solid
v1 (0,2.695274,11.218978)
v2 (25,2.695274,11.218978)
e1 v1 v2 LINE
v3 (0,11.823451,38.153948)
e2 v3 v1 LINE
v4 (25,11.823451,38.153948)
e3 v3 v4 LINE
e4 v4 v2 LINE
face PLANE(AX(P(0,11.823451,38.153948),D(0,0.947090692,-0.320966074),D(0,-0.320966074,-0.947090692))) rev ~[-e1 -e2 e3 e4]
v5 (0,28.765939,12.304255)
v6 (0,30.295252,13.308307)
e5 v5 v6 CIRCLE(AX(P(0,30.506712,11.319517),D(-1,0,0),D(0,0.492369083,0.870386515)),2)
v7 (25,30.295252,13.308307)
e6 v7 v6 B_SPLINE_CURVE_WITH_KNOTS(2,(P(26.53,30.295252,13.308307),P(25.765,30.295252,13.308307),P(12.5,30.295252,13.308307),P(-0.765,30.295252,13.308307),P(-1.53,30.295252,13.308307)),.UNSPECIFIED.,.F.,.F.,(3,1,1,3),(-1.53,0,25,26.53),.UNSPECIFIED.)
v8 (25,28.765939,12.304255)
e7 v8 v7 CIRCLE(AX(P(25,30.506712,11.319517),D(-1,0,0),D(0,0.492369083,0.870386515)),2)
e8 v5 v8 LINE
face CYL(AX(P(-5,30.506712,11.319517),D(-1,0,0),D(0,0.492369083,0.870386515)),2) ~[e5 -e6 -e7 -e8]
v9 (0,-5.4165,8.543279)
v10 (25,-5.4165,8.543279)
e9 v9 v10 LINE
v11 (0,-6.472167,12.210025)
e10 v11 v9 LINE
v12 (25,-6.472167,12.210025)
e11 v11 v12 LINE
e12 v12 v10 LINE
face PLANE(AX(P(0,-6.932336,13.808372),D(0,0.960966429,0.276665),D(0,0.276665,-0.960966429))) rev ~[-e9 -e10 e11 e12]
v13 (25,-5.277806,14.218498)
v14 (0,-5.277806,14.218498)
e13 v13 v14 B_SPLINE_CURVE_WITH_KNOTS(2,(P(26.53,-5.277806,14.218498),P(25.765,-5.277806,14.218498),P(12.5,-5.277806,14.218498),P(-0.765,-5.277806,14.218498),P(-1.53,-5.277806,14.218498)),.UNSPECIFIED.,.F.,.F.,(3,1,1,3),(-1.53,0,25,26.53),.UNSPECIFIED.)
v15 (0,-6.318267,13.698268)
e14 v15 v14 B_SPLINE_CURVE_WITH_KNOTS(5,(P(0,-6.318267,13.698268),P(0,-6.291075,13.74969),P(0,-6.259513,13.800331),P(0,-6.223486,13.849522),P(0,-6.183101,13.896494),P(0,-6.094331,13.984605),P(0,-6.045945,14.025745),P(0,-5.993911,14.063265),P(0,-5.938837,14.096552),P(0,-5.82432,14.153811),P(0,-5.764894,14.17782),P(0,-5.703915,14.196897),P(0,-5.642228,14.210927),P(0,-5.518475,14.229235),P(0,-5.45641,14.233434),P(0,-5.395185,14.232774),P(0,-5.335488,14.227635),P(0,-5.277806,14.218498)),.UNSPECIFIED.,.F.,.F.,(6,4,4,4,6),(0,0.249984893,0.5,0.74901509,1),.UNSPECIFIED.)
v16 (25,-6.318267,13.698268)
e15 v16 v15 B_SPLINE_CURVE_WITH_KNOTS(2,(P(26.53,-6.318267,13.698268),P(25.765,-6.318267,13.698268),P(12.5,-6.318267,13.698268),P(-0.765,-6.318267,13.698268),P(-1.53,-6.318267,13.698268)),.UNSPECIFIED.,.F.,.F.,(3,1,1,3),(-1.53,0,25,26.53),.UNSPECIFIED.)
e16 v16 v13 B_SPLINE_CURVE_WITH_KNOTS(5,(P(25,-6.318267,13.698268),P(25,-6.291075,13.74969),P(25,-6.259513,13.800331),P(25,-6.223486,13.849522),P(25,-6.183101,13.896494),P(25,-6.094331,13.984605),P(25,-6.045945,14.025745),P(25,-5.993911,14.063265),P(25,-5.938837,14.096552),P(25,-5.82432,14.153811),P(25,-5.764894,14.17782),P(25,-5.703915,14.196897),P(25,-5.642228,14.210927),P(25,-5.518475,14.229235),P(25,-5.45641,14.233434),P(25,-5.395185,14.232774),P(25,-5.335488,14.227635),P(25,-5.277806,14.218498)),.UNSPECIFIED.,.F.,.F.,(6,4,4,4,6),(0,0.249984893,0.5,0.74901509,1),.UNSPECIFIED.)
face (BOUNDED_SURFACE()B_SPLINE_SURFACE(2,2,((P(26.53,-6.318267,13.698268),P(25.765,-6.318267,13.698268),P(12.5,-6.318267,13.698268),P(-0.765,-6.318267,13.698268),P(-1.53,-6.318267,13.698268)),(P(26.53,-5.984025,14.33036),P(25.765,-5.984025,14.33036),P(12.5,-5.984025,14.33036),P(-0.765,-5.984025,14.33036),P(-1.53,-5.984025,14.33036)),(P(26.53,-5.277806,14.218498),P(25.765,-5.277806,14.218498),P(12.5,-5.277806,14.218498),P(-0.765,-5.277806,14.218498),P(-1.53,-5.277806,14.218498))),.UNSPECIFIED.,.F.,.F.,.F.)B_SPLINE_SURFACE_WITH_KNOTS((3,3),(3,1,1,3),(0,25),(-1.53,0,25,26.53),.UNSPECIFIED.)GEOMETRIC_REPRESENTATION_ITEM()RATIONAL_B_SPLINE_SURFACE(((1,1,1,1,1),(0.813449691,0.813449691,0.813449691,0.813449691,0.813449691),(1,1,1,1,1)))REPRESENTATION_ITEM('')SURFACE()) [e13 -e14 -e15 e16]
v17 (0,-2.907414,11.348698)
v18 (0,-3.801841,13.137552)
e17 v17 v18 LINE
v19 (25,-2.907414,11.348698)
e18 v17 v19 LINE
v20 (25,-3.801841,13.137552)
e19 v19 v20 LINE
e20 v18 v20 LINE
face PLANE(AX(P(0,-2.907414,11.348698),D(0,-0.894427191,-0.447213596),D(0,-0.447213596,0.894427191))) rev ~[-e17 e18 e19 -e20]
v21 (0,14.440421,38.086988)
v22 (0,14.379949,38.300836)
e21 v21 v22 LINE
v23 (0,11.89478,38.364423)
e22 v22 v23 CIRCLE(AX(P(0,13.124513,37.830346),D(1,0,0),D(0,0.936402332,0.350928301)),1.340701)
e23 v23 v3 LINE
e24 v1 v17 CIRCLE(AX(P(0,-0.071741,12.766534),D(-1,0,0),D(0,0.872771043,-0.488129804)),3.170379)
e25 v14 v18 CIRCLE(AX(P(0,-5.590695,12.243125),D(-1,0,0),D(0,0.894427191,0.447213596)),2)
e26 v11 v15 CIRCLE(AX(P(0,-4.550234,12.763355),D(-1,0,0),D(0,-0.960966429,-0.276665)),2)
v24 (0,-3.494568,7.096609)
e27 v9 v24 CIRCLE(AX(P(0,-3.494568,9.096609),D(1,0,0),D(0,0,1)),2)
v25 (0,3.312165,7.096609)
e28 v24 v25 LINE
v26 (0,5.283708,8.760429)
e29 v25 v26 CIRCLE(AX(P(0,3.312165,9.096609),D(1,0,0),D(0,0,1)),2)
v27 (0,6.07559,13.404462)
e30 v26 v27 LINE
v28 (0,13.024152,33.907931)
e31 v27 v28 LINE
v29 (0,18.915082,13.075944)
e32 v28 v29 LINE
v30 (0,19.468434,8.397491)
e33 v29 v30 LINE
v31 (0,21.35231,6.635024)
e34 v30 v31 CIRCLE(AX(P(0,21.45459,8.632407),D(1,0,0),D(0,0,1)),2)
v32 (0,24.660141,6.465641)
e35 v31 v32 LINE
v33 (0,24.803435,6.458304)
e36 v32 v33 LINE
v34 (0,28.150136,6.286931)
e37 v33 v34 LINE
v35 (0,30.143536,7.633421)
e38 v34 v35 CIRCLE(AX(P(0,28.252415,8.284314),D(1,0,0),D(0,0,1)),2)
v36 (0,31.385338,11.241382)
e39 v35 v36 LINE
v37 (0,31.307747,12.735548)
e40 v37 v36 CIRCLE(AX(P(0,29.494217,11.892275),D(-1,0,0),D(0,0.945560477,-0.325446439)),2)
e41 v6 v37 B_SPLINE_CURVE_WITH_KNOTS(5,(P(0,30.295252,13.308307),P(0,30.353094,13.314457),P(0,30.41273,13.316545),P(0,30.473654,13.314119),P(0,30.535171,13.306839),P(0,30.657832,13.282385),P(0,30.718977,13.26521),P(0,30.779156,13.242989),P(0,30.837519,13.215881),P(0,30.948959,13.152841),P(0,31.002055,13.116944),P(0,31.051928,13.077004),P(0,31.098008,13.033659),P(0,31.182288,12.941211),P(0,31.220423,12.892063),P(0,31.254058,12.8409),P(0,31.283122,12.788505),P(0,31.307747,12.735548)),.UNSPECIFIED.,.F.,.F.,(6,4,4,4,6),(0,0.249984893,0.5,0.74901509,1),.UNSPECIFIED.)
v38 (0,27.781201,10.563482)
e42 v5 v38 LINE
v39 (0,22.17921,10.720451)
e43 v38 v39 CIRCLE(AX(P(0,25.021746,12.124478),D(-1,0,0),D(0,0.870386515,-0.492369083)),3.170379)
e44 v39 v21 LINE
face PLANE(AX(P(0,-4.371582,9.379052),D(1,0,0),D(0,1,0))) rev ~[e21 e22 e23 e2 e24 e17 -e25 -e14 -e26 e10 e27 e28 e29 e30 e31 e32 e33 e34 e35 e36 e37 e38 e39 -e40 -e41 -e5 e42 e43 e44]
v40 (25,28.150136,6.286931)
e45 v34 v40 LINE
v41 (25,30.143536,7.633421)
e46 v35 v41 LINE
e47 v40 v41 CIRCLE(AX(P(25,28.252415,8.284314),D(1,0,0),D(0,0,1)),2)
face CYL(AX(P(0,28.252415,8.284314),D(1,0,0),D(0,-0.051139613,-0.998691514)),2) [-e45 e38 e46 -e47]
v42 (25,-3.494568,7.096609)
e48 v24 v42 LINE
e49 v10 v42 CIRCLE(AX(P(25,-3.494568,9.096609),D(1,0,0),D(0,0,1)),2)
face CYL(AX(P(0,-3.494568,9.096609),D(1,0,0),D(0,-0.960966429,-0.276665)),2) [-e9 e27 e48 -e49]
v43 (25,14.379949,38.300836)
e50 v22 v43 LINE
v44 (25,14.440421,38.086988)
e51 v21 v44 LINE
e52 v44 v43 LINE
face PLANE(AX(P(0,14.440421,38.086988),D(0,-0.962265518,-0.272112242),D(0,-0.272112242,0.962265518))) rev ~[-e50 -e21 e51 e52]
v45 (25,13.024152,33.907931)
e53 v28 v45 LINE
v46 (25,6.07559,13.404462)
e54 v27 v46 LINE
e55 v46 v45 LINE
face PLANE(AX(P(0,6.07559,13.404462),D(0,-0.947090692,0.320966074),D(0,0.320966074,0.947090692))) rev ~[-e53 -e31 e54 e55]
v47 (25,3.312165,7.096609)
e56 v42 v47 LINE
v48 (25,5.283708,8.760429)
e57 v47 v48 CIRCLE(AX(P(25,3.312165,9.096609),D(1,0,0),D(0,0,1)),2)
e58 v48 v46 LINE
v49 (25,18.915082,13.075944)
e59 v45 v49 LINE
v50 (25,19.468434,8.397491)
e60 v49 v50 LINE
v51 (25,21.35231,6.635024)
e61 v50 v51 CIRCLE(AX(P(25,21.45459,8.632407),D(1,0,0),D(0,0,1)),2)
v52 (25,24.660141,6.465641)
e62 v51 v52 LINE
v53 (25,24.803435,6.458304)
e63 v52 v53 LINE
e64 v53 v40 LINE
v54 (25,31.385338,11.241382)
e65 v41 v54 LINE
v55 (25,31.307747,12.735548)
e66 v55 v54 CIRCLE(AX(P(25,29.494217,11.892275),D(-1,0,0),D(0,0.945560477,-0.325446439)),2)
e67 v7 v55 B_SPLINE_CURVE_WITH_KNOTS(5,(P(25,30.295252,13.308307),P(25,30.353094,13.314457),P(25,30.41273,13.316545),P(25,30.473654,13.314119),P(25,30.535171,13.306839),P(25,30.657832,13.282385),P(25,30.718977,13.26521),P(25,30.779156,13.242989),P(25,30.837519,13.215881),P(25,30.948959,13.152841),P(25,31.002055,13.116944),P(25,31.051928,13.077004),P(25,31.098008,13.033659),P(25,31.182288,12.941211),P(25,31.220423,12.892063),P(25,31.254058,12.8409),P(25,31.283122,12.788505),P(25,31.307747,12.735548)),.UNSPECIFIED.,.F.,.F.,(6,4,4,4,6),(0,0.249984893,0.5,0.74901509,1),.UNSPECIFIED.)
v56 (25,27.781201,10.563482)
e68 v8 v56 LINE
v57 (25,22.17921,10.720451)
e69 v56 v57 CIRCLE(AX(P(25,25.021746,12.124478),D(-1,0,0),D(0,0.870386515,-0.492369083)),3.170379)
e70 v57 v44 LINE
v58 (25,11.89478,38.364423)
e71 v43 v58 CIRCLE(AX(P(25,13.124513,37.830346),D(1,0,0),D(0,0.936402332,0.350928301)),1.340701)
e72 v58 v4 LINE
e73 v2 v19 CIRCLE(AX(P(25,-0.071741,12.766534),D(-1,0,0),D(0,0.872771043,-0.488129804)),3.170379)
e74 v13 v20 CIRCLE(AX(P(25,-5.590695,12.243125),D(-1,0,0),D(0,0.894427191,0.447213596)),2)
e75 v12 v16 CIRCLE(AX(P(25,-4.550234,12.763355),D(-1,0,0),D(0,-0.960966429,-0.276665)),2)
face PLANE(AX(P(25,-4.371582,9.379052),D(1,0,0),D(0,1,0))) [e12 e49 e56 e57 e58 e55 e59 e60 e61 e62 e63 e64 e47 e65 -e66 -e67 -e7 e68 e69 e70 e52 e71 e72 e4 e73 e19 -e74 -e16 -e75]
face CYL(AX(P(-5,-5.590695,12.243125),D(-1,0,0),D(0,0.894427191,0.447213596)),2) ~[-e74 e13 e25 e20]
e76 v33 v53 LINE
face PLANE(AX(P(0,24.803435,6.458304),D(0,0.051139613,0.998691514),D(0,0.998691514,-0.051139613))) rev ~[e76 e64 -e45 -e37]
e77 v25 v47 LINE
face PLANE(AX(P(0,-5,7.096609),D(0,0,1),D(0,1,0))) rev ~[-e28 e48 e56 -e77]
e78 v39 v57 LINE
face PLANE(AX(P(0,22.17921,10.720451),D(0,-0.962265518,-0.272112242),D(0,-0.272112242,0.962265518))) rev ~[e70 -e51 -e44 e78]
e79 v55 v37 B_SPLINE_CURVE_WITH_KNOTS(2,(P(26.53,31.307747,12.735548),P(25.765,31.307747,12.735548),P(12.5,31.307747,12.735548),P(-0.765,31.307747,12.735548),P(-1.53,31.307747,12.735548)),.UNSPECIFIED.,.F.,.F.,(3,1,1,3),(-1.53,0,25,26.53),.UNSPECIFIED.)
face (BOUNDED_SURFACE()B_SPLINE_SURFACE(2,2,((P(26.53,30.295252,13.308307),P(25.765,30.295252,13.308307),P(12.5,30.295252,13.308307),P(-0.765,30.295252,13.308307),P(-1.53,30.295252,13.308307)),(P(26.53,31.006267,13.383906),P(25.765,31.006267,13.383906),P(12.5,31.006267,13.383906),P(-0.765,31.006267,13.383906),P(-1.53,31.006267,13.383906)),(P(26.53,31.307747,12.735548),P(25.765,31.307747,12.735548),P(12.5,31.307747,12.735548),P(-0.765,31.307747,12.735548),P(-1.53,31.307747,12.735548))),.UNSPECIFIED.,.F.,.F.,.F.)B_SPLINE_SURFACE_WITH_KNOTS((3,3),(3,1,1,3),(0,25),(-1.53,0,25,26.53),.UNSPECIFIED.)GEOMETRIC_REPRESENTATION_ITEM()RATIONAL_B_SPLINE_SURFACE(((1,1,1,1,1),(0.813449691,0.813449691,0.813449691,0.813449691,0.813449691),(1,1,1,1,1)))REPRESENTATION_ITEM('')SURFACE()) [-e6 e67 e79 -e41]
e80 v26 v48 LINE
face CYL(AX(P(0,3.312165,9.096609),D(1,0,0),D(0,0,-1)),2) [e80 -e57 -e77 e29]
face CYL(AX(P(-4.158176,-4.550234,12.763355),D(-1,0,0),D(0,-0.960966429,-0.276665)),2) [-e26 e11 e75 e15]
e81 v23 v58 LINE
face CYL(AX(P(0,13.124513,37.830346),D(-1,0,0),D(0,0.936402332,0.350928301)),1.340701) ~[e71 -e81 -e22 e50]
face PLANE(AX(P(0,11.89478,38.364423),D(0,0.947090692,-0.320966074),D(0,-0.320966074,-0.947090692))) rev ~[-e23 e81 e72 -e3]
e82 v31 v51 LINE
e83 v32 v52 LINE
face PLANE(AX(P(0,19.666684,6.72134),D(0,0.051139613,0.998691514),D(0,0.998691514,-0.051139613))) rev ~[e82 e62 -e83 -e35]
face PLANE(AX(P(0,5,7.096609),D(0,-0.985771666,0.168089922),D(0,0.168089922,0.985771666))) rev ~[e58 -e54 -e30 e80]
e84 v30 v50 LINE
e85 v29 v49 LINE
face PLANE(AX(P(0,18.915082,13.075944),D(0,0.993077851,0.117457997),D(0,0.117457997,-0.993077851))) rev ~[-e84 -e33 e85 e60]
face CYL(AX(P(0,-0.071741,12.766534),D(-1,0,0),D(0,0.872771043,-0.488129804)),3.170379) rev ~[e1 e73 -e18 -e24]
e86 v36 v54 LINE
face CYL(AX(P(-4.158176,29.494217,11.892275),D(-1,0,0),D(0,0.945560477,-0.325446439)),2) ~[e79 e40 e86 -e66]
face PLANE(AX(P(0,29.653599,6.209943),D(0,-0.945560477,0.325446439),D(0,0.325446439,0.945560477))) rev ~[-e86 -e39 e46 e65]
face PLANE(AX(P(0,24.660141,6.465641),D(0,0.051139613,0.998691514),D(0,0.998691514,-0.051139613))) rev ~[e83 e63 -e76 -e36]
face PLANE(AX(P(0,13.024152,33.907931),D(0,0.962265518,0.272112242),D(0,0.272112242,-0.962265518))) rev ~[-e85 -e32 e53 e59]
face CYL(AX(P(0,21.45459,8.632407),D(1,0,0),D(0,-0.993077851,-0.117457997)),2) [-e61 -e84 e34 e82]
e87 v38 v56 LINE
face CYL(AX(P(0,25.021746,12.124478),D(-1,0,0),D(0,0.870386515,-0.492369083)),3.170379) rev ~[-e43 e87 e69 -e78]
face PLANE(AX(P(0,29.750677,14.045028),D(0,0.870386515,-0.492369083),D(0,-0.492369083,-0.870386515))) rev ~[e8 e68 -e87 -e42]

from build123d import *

# Parameters (mm, degrees)
F1_DEPTH    = 25
F2_T1_DEPTH = 35
F2_T3_DEPTH = 33.3163528131
F3_R        = 1
F4_R        = 2


# Not quite as in the source:
# - a fillet or chamfer that OpenCascade refuses, or shapes differently, is made with other operations: its cross-section is extruded or revolved along the edge and cut away or added


with BuildPart() as f1:
    # F0 (on Right) → F1 (new body)
    with BuildSketch(Plane.YZ):
        with BuildLine():
            Line((-6.9323359057, 13.8083724305), (-5, 7.0966093383))
            Line((-5, 7.0966093383), (-0.1434815237, 7.0966093383))
            ThreePointArc((-0.1434815237, 7.0966093383), (-3.0832893136, 7.9619770163), (-5.1434815237, 10.2306636665))
            Line((-5.1434815237, 10.2306636665), (-6.9323359057, 13.8083724305))
        make_face()
        with BuildLine():
            ThreePointArc((-5.1434815237, 10.2306636665), (-3.0832893136, 7.9619770163), (-0.1434815237, 7.0966093383))
            Line((-0.1434815237, 7.0966093383), (0, 7.0966093383))
            ThreePointArc((0, 7.0966093383), (2.9398077898, 7.9619770163), (5, 10.2306636665))
            Line((5, 10.2306636665), (6.0755903162, 13.4044619593))
            Line((6.0755903162, 13.4044619593), (13.0241518458, 33.9079309741))
            Line((13.0241518458, 33.9079309741), (11.8234508953, 38.1539476614))
            Line((11.8234508953, 38.1539476614), (2.6952738362, 11.2189777838))
            ThreePointArc((2.6952738362, 11.2189777838), (-0.1451253509, 9.597004922), (-2.9074135462, 11.3486976553))
            Line((-2.9074135462, 11.3486976553), (-4.6962679282, 14.9264064193))
            Line((-4.6962679282, 14.9264064193), (-6.9323359057, 13.8083724305))
            Line((-6.9323359057, 13.8083724305), (-5.1434815237, 10.2306636665))
        make_face()
        with BuildLine():
            ThreePointArc((5, 10.2306636665), (2.9398077898, 7.9619770163), (0, 7.0966093383))
            Line((0, 7.0966093383), (5, 7.0966093383))
            Line((5, 7.0966093383), (6.0755903162, 13.4044619593))
            Line((6.0755903162, 13.4044619593), (5, 10.2306636665))
        make_face()
        with BuildLine():
            Line((11.8234508953, 38.1539476614), (13.0241518458, 33.9079309741))
            Line((13.0241518458, 33.9079309741), (14.4404213471, 38.0869884254))
            Line((14.4404213471, 38.0869884254), (14.3799488187, 38.3008363155))
            ThreePointArc((14.3799488187, 38.3008363155), (13.1588056017, 39.1706090028), (11.8947803947, 38.3644231928))
            Line((11.8947803947, 38.3644231928), (11.8234508953, 38.1539476614))
        make_face()
        with BuildLine():
            Line((14.4404213471, 38.0869884254), (13.0241518458, 33.9079309741))
            Line((13.0241518458, 33.9079309741), (18.9150818034, 13.075943714))
            Line((18.9150818034, 13.075943714), (19.8269579074, 9.8512930193))
            ThreePointArc((19.8269579074, 9.8512930193), (21.7684346268, 7.4802174812), (24.6601411506, 6.4656414912))
            Line((24.6601411506, 6.4656414912), (24.8034349308, 6.4583039016))
            ThreePointArc((24.8034349308, 6.4583039016), (27.7836505914, 7.1721986247), (29.9571668266, 9.332559297))
            Line((29.9571668266, 9.332559297), (31.9266431601, 12.8141053576))
            Line((31.9266431601, 12.8141053576), (29.7506768723, 14.045028066))
            Line((29.7506768723, 14.045028066), (27.7812005388, 10.5634820055))
            ThreePointArc((27.7812005388, 10.5634820055), (24.9329458702, 8.9553436878), (22.1792103708, 10.7204511366))
            Line((22.1792103708, 10.7204511366), (14.4404213471, 38.0869884254))
        make_face()
        with BuildLine():
            Line((19.8269579074, 9.8512930193), (18.9150818034, 13.075943714))
            Line((18.9150818034, 13.075943714), (19.6666835811, 6.7213395575))
            Line((19.6666835811, 6.7213395575), (24.6601411506, 6.4656414912))
            ThreePointArc((24.6601411506, 6.4656414912), (21.7684346268, 7.4802174812), (19.8269579074, 9.8512930193))
        make_face()
        with BuildLine():
            ThreePointArc((29.9571668266, 9.332559297), (27.7836505914, 7.1721986247), (24.8034349308, 6.4583039016))
            Line((24.8034349308, 6.4583039016), (29.6535987202, 6.2099434249))
            Line((29.6535987202, 6.2099434249), (31.9266431601, 12.8141053576))
            Line((31.9266431601, 12.8141053576), (29.9571668266, 9.332559297))
        make_face()
    extrude(amount=F1_DEPTH)

    # F2: fillet of radius 2 on 4 edges, made by hand

    # F2_s2 → F2_t1 (cut)
    with BuildSketch(Plane.YZ.offset(-5)):
        with BuildLine():
            ThreePointArc((-3.8018407372, 13.1375520373), (-4.9582395872, 14.1404914424), (-6.4851223102, 14.0319792283))
            Line((-6.4851223102, 14.0319792283), (-4.6962679282, 14.9264064193))
            Line((-4.6962679282, 14.9264064193), (-3.8018407372, 13.1375520373))
        make_face()
        with BuildLine():
            ThreePointArc((31.4914499025, 13.0602898993), (29.972114357, 13.2467443186), (28.7659387055, 12.3042550357))
            Line((28.7659387055, 12.3042550357), (29.7506768723, 14.045028066))
            Line((29.7506768723, 14.045028066), (31.4914499025, 13.0602898993))
        make_face()
    extrude(amount=F2_T1_DEPTH, mode=Mode.SUBTRACT)

    # F2_s4 → F2_t3 (cut)
    with BuildSketch(Plane.YZ.offset(-4.1581764065)):
        with BuildLine():
            ThreePointArc((-6.4721671557, 12.2100252573), (-6.3817440303, 13.5668302715), (-5.4446614885, 14.5522096391))
            Line((-5.4446614885, 14.5522096391), (-6.9323359057, 13.8083724305))
            Line((-6.9323359057, 13.8083724305), (-6.4721671557, 12.2100252573))
        make_face()
        with BuildLine():
            ThreePointArc((31.3853376782, 11.2413824514), (31.3644193539, 12.6010363088), (30.4789548914, 13.6330483599))
            Line((30.4789548914, 13.6330483599), (31.9266431601, 12.8141053576))
            Line((31.9266431601, 12.8141053576), (31.3853376782, 11.2413824514))
        make_face()
    extrude(amount=F2_T3_DEPTH, mode=Mode.SUBTRACT)

    # F3
    f3_edges = [f1.edges().sort_by_distance(p)[0] for p in [
        (12.5, -5.926233, 14.214777),
        (12.5, 30.942641, 13.27143),
    ]]
    fillet(f3_edges, radius=F3_R)

    # F4
    f4_edges = [f1.edges().sort_by_distance(p)[0] for p in [
        (12.5, -5, 7.096609),
        (12.5, 5, 7.096609),
        (12.5, 19.666684, 6.72134),
        (12.5, 29.653599, 6.209943),
    ]]
    fillet(f4_edges, radius=F4_R)


solid = f1.part
